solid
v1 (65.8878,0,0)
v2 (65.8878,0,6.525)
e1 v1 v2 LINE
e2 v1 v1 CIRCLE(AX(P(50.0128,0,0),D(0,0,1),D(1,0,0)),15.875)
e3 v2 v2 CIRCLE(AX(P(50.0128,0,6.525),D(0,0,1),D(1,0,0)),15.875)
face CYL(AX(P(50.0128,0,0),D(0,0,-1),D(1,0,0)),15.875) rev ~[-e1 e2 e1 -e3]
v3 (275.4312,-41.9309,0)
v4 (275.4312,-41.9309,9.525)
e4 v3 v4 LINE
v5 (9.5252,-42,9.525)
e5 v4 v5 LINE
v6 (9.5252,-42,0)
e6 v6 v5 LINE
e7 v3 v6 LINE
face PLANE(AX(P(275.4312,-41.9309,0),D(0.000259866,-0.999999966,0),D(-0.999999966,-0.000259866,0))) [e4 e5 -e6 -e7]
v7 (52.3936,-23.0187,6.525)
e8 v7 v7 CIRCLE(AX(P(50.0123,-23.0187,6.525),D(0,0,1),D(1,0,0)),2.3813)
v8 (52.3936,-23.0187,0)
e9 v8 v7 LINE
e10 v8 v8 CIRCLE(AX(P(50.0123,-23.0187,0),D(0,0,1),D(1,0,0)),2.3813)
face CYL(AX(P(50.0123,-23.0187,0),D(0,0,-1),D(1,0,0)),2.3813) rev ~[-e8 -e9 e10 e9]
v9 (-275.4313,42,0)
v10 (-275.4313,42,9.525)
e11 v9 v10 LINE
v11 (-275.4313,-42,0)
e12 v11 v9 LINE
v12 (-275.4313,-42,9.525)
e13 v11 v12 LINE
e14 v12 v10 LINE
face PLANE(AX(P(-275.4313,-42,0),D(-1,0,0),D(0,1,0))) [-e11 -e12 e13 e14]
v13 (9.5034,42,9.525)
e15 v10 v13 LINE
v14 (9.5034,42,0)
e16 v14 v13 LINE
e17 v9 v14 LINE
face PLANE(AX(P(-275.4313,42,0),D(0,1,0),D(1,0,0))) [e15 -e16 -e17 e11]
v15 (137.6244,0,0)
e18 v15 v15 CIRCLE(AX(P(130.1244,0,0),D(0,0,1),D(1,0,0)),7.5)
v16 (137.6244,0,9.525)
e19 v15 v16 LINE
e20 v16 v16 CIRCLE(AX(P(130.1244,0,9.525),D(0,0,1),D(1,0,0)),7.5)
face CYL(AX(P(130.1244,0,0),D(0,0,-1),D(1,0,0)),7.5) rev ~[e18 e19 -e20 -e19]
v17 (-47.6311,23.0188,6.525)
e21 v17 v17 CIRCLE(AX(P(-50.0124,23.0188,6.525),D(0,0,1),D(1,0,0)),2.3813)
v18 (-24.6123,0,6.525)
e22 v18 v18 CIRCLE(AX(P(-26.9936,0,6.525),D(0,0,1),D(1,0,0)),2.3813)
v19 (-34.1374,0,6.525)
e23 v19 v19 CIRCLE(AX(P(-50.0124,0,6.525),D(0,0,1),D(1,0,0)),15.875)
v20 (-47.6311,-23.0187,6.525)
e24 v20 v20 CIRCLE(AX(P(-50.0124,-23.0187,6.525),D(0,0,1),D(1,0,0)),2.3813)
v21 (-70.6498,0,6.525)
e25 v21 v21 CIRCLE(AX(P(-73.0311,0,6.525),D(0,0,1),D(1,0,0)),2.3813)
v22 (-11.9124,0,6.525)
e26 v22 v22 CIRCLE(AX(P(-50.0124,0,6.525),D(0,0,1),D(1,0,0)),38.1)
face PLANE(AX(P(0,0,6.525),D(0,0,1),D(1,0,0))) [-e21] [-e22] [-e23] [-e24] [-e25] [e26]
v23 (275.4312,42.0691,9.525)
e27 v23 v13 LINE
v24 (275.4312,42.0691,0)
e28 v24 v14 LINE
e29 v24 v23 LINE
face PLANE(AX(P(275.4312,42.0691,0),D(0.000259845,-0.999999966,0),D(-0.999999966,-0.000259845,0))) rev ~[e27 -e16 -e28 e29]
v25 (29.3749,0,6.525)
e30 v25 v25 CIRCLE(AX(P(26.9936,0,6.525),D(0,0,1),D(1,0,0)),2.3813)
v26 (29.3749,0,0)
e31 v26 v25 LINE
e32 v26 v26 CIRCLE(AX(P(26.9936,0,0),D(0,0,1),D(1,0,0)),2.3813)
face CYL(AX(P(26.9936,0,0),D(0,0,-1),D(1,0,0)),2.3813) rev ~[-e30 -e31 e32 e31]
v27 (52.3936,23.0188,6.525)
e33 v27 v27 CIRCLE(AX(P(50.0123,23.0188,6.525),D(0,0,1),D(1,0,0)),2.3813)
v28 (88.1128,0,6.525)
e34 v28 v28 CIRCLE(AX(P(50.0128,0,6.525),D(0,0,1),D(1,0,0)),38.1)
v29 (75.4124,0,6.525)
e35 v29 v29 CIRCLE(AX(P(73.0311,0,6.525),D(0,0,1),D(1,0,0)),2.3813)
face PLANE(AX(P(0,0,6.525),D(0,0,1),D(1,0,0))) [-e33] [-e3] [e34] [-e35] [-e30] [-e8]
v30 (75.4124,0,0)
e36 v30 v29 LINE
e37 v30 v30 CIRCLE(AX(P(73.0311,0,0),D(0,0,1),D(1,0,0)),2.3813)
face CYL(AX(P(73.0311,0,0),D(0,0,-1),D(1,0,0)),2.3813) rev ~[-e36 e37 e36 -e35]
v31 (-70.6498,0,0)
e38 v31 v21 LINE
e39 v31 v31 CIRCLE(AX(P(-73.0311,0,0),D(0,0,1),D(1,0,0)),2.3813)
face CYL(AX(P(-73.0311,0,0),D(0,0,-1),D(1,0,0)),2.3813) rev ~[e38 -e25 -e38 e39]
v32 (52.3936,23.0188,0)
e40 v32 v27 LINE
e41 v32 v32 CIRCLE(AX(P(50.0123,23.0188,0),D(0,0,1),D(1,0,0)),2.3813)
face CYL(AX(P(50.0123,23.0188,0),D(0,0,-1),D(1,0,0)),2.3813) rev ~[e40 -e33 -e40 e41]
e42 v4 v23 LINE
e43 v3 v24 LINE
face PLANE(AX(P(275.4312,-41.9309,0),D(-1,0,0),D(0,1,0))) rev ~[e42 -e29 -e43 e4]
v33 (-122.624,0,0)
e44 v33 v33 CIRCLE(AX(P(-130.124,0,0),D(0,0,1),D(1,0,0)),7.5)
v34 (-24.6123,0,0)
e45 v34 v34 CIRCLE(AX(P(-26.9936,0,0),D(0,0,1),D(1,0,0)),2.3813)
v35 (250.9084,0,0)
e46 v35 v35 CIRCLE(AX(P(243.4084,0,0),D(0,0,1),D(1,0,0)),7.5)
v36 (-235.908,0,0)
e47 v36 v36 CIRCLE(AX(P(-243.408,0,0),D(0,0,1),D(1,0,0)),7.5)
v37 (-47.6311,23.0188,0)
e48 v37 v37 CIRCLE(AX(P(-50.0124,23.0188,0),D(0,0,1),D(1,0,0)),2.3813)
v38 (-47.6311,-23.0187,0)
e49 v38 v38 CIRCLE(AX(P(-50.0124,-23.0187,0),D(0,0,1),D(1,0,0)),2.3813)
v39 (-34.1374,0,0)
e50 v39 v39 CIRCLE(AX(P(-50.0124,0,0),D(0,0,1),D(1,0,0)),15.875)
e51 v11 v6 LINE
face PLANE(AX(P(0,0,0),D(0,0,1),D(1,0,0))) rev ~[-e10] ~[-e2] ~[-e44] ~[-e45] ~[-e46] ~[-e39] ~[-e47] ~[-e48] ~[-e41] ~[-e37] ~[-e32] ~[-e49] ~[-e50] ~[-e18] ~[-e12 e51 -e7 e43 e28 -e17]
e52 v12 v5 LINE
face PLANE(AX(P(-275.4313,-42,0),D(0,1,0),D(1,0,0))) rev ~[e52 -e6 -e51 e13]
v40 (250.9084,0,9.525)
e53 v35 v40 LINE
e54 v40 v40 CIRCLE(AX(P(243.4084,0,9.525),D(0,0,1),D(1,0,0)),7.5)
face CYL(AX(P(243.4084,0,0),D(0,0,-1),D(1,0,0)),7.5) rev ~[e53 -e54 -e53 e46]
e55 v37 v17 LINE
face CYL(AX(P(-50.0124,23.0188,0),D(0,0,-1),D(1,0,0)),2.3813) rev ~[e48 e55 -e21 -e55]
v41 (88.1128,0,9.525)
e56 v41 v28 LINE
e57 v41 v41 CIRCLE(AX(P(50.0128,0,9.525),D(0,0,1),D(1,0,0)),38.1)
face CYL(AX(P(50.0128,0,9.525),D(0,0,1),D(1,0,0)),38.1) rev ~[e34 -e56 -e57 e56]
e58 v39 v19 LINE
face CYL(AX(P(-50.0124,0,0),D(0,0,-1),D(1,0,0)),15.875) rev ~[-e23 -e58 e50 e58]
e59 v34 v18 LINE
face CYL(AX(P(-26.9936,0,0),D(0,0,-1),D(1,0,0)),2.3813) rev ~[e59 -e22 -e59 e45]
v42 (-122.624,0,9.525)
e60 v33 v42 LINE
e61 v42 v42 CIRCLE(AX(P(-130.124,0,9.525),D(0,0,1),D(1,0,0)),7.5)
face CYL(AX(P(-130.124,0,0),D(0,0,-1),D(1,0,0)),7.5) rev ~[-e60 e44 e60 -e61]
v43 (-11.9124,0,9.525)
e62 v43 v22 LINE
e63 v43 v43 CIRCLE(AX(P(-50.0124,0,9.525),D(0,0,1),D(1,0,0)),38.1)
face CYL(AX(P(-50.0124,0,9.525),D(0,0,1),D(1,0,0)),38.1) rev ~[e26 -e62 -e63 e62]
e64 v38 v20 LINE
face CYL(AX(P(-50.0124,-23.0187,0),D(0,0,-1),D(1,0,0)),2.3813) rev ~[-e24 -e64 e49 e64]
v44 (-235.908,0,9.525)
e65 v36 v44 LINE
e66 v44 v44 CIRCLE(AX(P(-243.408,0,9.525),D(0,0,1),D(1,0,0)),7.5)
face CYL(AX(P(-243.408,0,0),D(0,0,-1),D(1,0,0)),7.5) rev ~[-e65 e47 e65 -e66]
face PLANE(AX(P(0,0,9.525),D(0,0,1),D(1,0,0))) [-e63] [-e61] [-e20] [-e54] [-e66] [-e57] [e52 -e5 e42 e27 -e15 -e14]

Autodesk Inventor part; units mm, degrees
ref_plane "YZ Plane" through (0, 0, 0) normal (1, 0, 0) x (0, 1, 0)
ref_plane "XZ Plane" through (0, 0, 0) normal (0, 1, 0) x (-1, 0, 0)
ref_plane "XY Plane" through (0, 0, 0) normal (0, 0, 1) x (1, 0, 0)
sketch "Sketch1" plane through (0, 0, 0) normal (0, 0, 1) x (1, 0, 0)
  line L0 (-275.4313, -42) -> (-275.4313, 42)
  circle A0 centre (-243.408, 0) radius 7.5
  circle A1 centre (-130.124, 0) radius 7.5
  circle A2 centre (-50.0124, 0) radius 15.875
  circle A3 centre (-50.0124, 23.0188) radius 2.3813
  circle A4 centre (-26.9936, 0) radius 2.3813
  circle A5 centre (-73.0311, 0) radius 2.3813
  circle A6 centre (-50.0124, -23.0187) radius 2.3813
  line L1 (-275.4313, 42) -> (9.5034, 42)
  line L2 (-275.4313, -42) -> (9.5252, -42)
  line L3 (275.4312, -41.9309) -> (275.4312, 42.0691)
  line L4 (275.4312, 42.0691) -> (9.5034, 42)
  line L5 (275.4312, -41.9309) -> (9.5252, -42)
  circle A7 centre (-50.0124, 0) radius 38.1
  circle A8 centre (243.4084, 0) radius 7.5
  circle A9 centre (130.1244, 0) radius 7.5
  circle A10 centre (50.0128, 0) radius 15.875
  circle A11 centre (50.0123, 23.0188) radius 2.3813
  circle A12 centre (26.9936, 0) radius 2.3813
  circle A13 centre (73.0311, 0) radius 2.3813
  circle A14 centre (50.0123, -23.0187) radius 2.3813
  circle A15 centre (50.0128, 0) radius 38.1
  dimension "d4" = 15
  dimension "d7" = 15
  dimension "d9" = 31.75
  dimension "d11" = 4.7625
  dimension "d13" = 4.7625
  dimension "d15" = 23.0188
  dimension "d16" = 4.7625
  dimension "d18" = 4.7625
  dimension "d25" = 550.8625
  dimension "d50" = 23.0188
  dimension "d51" = 23.0188
  dimension "d52" = 23.0188
  dimension "d53" = 80.1116
  dimension "d54" = 113.284
  dimension "d62" = 76.2
  dimension "d88" = 84
  dimension "d89" = 42
  dimension "d90" = 42
  dimension "d91" = 32.0233
  dimension "d92" = 42
  dimension "d93" = 42
  dimension "d97" = 100.0252
  dimension "d98" = 80.1116
  dimension "d99" = 113.284
  dimension "d100" = 32.0228
extrude "Extrusion4" add sketch "Sketch1" along normal blind 9.525 contours L0 L1 L4 L3 L5 L2 | A7 | A15
sketch "Sketch5" plane through (0, 0, 9.525) normal (0, 0, 1) x (1, 0, 0)
  line L0 (-275.4313, -42) -> (-275.4313, 42)
  circle A0 centre (-243.408, 0) radius 7.5
  circle A1 centre (-130.124, 0) radius 7.5
  circle A2 centre (-50.0124, 0) radius 15.875
  circle A3 centre (-50.0124, 23.0188) radius 2.3813
  circle A4 centre (-26.9936, 0) radius 2.3813
  circle A5 centre (-73.0311, 0) radius 2.3813
  circle A6 centre (-50.0124, -23.0187) radius 2.3813
  line L1 (-275.4313, 42) -> (9.5034, 42)
  line L2 (-275.4313, -42) -> (9.5143, -42)
  line L3 (275.4312, -41.9309) -> (9.5143, -42)
  line L4 (275.4312, 42.0691) -> (9.5034, 42)
  line L5 (275.4312, -41.9309) -> (275.4312, 42.0691)
  circle A7 centre (-50.0124, 0) radius 38.1
  circle A8 centre (50.0123, -23.0187) radius 2.3813
  circle A9 centre (50.0123, 23.0188) radius 2.3813
  circle A10 centre (26.9936, 0) radius 2.3813
  circle A11 centre (50.0128, 0) radius 15.875
  circle A12 centre (73.0311, 0) radius 2.3813
  circle A13 centre (50.0128, 0) radius 38.1
  circle A14 centre (130.1244, 0) radius 7.5
  circle A15 centre (243.4084, 0) radius 7.5
  point P0 (0, 0)
  dimension "d103" = 15
  dimension "d104" = 15
  dimension "d105" = 31.75
  dimension "d106" = 4.7625
  dimension "d107" = 4.7625
  dimension "d108" = 23.0188
  dimension "d109" = 4.7625
  dimension "d110" = 4.7625
  dimension "d111" = 550.8625
  dimension "d112" = 23.0188
  dimension "d113" = 23.0188
  dimension "d114" = 23.0188
  dimension "d115" = 80.1116
  dimension "d116" = 113.284
  dimension "d117" = 76.2
  dimension "d118" = 84
  dimension "d119" = 42
  dimension "d120" = 42
  dimension "d121" = 32.0233
  dimension "d122" = 42
  dimension "d123" = 42
  dimension "d124" = 100.0252
  dimension "d125" = 80.1116
  dimension "d126" = 113.284
  dimension "d127" = 32.0228
emboss "Emboss4" sketch "Sketch5" operation cut depth 3 direction (0, 0, -1) contours A7 | A13
properties part number "Drivetrainsideinside"
